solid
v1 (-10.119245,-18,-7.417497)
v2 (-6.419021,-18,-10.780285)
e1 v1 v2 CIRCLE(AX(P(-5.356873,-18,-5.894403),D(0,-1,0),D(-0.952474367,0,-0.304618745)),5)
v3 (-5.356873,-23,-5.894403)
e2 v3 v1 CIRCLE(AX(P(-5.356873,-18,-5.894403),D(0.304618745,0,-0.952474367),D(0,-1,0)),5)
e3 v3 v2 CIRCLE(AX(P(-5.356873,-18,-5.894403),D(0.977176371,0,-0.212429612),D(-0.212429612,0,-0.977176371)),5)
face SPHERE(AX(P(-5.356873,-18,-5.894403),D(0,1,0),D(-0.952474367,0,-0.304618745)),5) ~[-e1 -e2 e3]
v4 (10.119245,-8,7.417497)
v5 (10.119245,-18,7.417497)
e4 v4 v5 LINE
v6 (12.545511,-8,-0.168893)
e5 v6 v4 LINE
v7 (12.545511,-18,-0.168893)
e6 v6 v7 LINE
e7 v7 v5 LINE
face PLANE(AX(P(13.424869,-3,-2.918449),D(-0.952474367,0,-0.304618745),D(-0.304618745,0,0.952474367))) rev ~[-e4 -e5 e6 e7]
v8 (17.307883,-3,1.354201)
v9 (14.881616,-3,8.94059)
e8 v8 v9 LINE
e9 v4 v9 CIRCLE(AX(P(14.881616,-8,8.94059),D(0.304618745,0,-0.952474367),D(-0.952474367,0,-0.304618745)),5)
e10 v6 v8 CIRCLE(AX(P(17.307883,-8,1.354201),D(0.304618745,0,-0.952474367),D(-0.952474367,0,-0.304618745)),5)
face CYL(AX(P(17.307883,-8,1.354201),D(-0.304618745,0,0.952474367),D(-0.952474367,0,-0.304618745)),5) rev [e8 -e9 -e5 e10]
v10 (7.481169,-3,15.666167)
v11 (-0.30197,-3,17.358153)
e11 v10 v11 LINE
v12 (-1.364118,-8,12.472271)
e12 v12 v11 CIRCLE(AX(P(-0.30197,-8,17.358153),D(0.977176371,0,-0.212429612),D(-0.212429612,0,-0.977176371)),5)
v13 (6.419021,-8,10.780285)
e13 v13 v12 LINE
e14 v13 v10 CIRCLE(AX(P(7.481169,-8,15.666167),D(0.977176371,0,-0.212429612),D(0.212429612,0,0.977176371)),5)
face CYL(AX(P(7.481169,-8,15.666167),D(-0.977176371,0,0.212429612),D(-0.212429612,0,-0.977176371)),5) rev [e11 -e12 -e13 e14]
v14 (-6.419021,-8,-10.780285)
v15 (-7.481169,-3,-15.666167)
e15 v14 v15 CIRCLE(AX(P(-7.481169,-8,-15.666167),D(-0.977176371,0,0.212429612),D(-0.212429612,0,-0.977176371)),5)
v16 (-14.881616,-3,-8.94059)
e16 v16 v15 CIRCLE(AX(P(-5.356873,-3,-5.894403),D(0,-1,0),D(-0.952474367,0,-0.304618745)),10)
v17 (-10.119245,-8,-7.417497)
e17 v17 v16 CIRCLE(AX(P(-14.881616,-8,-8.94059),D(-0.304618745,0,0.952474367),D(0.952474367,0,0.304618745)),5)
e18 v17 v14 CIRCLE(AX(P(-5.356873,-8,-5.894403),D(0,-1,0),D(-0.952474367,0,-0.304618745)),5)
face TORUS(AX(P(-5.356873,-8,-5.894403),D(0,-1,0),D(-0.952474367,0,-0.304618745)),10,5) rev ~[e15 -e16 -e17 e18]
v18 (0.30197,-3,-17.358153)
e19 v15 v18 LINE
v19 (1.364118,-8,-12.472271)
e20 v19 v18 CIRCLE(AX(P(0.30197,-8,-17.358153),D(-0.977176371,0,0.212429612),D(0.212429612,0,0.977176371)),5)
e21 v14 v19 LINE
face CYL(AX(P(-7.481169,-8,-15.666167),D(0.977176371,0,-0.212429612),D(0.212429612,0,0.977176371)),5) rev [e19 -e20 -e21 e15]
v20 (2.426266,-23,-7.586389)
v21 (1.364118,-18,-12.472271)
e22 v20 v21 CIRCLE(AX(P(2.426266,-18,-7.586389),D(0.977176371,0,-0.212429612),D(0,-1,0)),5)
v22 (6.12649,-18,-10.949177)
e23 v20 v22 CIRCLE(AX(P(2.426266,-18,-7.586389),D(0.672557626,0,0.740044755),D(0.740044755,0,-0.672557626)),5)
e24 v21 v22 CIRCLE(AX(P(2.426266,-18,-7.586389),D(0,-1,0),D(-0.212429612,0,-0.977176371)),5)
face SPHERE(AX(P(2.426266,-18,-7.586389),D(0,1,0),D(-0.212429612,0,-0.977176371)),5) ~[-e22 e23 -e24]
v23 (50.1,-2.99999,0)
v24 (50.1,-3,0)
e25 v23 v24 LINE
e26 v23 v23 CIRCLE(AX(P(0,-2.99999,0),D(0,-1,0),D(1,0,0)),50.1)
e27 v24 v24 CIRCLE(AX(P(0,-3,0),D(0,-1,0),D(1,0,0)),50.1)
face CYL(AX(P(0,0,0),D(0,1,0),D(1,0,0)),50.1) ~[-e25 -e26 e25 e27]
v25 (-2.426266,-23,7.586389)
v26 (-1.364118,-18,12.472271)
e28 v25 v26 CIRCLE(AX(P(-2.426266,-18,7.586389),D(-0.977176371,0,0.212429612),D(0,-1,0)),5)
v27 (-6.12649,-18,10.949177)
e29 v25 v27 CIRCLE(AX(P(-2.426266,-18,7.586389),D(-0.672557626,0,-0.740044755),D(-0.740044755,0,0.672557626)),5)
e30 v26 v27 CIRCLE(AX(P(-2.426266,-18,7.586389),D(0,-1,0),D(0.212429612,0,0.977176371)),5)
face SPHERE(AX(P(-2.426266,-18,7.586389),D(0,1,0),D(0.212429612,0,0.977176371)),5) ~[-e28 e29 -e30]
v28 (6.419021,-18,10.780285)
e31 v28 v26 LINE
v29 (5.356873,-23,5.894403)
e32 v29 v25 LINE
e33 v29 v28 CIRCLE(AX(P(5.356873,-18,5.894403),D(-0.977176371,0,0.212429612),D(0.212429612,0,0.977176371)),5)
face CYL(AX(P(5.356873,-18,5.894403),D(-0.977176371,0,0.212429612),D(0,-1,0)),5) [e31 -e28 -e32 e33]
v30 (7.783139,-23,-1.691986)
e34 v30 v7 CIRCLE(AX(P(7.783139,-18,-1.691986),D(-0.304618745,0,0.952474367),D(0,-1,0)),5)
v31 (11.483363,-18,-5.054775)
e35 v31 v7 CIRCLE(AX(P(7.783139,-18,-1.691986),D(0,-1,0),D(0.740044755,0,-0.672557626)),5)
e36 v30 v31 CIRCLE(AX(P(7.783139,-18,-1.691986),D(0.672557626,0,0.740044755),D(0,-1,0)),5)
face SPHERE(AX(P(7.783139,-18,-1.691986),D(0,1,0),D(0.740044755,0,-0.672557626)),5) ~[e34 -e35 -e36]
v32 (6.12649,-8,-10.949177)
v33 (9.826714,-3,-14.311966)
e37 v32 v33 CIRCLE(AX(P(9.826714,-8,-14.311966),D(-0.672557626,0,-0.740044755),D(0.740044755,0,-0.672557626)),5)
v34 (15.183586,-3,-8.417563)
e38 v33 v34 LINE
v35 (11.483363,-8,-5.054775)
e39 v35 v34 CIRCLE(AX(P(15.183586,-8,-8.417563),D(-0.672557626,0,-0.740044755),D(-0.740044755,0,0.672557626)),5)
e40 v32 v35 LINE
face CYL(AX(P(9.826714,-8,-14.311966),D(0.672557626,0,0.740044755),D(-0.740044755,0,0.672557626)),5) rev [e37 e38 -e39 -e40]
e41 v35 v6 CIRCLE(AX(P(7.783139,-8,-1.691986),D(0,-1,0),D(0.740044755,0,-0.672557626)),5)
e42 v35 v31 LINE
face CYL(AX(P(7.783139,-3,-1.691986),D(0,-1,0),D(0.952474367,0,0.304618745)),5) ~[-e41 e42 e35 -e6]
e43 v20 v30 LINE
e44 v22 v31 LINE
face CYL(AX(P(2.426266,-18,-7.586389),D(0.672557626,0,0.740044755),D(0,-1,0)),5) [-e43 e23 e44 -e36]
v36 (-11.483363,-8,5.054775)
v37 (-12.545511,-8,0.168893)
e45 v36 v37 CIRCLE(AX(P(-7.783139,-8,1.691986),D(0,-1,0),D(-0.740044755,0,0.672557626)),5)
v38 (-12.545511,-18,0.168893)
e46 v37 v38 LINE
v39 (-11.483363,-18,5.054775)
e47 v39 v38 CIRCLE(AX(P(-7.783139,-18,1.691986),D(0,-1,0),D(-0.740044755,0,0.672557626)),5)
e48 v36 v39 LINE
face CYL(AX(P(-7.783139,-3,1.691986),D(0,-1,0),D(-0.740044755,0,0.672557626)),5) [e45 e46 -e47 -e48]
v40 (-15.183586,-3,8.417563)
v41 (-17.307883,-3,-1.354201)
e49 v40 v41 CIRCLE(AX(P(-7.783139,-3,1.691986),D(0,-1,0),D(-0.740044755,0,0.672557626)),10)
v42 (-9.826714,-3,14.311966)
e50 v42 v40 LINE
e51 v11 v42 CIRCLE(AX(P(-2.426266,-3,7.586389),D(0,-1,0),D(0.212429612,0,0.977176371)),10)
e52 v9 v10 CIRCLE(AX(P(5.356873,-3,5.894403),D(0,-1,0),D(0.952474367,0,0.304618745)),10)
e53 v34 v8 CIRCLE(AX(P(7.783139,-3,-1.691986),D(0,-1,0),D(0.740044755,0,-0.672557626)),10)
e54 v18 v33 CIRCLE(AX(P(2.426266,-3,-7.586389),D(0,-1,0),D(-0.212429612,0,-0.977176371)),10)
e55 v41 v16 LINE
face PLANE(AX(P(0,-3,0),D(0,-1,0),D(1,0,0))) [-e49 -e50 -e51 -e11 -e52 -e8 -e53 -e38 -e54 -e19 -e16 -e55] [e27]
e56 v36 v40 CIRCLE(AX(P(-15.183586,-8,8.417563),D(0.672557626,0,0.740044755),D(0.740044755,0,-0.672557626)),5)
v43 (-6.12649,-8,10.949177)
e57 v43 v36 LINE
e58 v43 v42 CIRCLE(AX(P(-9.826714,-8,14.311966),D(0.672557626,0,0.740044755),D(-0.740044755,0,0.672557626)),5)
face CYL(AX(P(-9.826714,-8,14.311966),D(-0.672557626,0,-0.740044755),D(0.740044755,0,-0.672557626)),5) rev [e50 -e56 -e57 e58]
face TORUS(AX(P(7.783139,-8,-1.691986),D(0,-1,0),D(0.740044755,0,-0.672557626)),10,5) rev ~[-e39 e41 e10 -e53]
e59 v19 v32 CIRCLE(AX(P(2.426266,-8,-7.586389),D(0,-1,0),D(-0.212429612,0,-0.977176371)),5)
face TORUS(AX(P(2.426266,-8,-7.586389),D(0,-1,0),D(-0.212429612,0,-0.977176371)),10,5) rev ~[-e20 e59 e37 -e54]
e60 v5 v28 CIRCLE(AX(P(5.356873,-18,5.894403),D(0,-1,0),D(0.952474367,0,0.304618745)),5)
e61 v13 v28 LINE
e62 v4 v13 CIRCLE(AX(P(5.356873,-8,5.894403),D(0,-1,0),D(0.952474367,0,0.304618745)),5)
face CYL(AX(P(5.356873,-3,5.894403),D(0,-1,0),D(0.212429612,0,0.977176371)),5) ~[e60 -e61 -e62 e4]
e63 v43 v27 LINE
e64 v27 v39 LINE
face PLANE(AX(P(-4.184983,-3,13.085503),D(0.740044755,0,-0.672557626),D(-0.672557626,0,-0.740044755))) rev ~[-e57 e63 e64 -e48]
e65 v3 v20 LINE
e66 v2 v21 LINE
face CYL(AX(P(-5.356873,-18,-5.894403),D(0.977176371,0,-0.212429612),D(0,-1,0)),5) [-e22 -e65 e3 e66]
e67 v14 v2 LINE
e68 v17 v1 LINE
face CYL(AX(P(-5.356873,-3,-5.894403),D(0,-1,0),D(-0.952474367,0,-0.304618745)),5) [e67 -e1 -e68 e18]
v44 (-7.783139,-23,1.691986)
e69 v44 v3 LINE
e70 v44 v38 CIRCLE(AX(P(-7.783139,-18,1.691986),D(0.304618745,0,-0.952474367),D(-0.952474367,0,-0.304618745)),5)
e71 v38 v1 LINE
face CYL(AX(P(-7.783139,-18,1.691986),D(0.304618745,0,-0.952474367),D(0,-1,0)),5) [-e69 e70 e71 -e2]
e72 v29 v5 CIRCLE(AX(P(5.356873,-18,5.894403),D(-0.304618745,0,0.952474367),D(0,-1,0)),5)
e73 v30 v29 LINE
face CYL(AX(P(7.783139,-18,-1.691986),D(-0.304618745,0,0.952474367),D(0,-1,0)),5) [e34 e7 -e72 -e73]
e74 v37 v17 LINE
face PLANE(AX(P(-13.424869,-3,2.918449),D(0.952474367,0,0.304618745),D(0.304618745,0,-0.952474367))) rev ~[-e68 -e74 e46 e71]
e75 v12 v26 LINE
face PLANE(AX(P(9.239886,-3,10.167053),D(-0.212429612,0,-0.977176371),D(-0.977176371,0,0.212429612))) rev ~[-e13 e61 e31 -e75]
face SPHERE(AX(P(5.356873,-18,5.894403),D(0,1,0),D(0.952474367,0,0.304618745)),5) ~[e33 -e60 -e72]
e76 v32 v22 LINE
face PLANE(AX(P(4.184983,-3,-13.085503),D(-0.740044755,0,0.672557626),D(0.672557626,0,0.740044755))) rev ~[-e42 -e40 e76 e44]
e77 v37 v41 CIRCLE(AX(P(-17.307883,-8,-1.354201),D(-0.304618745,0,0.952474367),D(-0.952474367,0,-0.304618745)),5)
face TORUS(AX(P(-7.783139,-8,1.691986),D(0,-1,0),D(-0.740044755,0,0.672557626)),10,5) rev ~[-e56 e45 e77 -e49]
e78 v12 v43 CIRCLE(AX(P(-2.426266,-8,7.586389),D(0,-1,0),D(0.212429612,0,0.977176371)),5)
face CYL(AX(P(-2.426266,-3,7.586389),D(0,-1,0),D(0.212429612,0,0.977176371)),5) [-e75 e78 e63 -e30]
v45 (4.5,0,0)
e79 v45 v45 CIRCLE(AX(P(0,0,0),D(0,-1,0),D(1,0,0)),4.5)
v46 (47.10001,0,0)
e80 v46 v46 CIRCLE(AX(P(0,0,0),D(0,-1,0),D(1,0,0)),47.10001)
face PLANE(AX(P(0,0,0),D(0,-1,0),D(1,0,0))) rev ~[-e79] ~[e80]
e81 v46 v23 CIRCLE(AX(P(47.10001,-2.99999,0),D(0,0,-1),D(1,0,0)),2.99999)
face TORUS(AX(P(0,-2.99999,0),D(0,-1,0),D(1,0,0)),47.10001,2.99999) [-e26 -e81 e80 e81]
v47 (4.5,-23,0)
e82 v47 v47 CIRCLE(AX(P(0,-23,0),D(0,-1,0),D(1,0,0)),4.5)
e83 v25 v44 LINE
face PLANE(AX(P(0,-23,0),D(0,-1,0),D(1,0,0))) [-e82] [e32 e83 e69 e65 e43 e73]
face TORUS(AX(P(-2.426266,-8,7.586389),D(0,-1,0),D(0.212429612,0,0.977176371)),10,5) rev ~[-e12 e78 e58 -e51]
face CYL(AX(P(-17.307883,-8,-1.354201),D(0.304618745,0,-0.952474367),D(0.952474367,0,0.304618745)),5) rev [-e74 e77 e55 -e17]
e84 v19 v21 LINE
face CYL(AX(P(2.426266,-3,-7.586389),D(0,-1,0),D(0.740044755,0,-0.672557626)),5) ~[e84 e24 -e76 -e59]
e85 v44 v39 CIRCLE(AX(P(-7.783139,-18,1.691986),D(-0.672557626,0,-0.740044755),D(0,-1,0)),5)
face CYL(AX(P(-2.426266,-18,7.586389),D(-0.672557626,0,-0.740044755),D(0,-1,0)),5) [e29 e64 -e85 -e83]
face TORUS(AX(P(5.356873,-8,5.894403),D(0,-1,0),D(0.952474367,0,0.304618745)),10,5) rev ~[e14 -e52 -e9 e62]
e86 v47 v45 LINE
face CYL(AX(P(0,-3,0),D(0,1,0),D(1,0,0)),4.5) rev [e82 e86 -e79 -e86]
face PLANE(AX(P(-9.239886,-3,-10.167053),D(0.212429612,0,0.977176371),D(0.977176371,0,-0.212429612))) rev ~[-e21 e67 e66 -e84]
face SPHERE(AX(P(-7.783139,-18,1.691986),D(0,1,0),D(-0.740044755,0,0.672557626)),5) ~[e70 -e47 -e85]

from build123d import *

# Parameters (mm, degrees)
F0_R     = 50.1
F0_R_2   = 4.5
F1_DEPTH = 3
F2_R     = 4.5
F3_DEPTH = 20
F4_R     = 2.99999
F5_R     = 5
F6_R     = 5


# Not quite as in the source:
# - a fillet or chamfer is up to 0.001 mm smaller than in the source, because OpenCascade refuses the exact size


with BuildPart() as f1:
    # F0 (on Front) → F1 (new body)
    with BuildSketch(Plane.XZ):
        Circle(F0_R)
        Circle(F0_R_2, mode=Mode.SUBTRACT)
    extrude(amount=F1_DEPTH)

    # F2 (on face) → F3 (join)
    with BuildSketch(Plane.XZ.offset(3)):
        Polygon((9.2398859849, 10.167053197), (-4.1849833578, 13.0855025895), (-13.4248693427, 2.9184493925), (-9.2398859849, -10.167053197), (4.1849833578, -13.0855025895), (13.4248693427, -2.9184493925), align=None)
        Circle(F2_R, mode=Mode.SUBTRACT)
    extrude(amount=F3_DEPTH)

    # F4 (radius 3 in the source; OpenCascade refuses exactly that, so slightly less here)
    f4_edges = [f1.edges().sort_by_distance(p)[0] for p in [
        (-50.1, 0, 0),
    ]]
    fillet(f4_edges, radius=F4_R)

    # F5
    f5_edges = [f1.edges().sort_by_distance(p)[0] for p in [
        (-4.184983, -13, 13.085503),
        (9.239886, -13, 10.167053),
        (13.424869, -13, -2.918449),
        (4.184983, -13, -13.085503),
        (-9.239886, -13, -10.167053),
        (-13.424869, -13, 2.918449),
    ]]
    fillet(f5_edges, radius=F5_R)

    # F6
    f6_edges = [f1.edges().sort_by_distance(p)[0] for p in [
        (11.332378, -3, 3.624302),
        (12.545511, -13, -0.168893),
        (10.119245, -13, 7.417497),
        (11.332378, -23, 3.624302),
    ]]
    fillet(f6_edges, radius=F6_R)


solid = f1.part
